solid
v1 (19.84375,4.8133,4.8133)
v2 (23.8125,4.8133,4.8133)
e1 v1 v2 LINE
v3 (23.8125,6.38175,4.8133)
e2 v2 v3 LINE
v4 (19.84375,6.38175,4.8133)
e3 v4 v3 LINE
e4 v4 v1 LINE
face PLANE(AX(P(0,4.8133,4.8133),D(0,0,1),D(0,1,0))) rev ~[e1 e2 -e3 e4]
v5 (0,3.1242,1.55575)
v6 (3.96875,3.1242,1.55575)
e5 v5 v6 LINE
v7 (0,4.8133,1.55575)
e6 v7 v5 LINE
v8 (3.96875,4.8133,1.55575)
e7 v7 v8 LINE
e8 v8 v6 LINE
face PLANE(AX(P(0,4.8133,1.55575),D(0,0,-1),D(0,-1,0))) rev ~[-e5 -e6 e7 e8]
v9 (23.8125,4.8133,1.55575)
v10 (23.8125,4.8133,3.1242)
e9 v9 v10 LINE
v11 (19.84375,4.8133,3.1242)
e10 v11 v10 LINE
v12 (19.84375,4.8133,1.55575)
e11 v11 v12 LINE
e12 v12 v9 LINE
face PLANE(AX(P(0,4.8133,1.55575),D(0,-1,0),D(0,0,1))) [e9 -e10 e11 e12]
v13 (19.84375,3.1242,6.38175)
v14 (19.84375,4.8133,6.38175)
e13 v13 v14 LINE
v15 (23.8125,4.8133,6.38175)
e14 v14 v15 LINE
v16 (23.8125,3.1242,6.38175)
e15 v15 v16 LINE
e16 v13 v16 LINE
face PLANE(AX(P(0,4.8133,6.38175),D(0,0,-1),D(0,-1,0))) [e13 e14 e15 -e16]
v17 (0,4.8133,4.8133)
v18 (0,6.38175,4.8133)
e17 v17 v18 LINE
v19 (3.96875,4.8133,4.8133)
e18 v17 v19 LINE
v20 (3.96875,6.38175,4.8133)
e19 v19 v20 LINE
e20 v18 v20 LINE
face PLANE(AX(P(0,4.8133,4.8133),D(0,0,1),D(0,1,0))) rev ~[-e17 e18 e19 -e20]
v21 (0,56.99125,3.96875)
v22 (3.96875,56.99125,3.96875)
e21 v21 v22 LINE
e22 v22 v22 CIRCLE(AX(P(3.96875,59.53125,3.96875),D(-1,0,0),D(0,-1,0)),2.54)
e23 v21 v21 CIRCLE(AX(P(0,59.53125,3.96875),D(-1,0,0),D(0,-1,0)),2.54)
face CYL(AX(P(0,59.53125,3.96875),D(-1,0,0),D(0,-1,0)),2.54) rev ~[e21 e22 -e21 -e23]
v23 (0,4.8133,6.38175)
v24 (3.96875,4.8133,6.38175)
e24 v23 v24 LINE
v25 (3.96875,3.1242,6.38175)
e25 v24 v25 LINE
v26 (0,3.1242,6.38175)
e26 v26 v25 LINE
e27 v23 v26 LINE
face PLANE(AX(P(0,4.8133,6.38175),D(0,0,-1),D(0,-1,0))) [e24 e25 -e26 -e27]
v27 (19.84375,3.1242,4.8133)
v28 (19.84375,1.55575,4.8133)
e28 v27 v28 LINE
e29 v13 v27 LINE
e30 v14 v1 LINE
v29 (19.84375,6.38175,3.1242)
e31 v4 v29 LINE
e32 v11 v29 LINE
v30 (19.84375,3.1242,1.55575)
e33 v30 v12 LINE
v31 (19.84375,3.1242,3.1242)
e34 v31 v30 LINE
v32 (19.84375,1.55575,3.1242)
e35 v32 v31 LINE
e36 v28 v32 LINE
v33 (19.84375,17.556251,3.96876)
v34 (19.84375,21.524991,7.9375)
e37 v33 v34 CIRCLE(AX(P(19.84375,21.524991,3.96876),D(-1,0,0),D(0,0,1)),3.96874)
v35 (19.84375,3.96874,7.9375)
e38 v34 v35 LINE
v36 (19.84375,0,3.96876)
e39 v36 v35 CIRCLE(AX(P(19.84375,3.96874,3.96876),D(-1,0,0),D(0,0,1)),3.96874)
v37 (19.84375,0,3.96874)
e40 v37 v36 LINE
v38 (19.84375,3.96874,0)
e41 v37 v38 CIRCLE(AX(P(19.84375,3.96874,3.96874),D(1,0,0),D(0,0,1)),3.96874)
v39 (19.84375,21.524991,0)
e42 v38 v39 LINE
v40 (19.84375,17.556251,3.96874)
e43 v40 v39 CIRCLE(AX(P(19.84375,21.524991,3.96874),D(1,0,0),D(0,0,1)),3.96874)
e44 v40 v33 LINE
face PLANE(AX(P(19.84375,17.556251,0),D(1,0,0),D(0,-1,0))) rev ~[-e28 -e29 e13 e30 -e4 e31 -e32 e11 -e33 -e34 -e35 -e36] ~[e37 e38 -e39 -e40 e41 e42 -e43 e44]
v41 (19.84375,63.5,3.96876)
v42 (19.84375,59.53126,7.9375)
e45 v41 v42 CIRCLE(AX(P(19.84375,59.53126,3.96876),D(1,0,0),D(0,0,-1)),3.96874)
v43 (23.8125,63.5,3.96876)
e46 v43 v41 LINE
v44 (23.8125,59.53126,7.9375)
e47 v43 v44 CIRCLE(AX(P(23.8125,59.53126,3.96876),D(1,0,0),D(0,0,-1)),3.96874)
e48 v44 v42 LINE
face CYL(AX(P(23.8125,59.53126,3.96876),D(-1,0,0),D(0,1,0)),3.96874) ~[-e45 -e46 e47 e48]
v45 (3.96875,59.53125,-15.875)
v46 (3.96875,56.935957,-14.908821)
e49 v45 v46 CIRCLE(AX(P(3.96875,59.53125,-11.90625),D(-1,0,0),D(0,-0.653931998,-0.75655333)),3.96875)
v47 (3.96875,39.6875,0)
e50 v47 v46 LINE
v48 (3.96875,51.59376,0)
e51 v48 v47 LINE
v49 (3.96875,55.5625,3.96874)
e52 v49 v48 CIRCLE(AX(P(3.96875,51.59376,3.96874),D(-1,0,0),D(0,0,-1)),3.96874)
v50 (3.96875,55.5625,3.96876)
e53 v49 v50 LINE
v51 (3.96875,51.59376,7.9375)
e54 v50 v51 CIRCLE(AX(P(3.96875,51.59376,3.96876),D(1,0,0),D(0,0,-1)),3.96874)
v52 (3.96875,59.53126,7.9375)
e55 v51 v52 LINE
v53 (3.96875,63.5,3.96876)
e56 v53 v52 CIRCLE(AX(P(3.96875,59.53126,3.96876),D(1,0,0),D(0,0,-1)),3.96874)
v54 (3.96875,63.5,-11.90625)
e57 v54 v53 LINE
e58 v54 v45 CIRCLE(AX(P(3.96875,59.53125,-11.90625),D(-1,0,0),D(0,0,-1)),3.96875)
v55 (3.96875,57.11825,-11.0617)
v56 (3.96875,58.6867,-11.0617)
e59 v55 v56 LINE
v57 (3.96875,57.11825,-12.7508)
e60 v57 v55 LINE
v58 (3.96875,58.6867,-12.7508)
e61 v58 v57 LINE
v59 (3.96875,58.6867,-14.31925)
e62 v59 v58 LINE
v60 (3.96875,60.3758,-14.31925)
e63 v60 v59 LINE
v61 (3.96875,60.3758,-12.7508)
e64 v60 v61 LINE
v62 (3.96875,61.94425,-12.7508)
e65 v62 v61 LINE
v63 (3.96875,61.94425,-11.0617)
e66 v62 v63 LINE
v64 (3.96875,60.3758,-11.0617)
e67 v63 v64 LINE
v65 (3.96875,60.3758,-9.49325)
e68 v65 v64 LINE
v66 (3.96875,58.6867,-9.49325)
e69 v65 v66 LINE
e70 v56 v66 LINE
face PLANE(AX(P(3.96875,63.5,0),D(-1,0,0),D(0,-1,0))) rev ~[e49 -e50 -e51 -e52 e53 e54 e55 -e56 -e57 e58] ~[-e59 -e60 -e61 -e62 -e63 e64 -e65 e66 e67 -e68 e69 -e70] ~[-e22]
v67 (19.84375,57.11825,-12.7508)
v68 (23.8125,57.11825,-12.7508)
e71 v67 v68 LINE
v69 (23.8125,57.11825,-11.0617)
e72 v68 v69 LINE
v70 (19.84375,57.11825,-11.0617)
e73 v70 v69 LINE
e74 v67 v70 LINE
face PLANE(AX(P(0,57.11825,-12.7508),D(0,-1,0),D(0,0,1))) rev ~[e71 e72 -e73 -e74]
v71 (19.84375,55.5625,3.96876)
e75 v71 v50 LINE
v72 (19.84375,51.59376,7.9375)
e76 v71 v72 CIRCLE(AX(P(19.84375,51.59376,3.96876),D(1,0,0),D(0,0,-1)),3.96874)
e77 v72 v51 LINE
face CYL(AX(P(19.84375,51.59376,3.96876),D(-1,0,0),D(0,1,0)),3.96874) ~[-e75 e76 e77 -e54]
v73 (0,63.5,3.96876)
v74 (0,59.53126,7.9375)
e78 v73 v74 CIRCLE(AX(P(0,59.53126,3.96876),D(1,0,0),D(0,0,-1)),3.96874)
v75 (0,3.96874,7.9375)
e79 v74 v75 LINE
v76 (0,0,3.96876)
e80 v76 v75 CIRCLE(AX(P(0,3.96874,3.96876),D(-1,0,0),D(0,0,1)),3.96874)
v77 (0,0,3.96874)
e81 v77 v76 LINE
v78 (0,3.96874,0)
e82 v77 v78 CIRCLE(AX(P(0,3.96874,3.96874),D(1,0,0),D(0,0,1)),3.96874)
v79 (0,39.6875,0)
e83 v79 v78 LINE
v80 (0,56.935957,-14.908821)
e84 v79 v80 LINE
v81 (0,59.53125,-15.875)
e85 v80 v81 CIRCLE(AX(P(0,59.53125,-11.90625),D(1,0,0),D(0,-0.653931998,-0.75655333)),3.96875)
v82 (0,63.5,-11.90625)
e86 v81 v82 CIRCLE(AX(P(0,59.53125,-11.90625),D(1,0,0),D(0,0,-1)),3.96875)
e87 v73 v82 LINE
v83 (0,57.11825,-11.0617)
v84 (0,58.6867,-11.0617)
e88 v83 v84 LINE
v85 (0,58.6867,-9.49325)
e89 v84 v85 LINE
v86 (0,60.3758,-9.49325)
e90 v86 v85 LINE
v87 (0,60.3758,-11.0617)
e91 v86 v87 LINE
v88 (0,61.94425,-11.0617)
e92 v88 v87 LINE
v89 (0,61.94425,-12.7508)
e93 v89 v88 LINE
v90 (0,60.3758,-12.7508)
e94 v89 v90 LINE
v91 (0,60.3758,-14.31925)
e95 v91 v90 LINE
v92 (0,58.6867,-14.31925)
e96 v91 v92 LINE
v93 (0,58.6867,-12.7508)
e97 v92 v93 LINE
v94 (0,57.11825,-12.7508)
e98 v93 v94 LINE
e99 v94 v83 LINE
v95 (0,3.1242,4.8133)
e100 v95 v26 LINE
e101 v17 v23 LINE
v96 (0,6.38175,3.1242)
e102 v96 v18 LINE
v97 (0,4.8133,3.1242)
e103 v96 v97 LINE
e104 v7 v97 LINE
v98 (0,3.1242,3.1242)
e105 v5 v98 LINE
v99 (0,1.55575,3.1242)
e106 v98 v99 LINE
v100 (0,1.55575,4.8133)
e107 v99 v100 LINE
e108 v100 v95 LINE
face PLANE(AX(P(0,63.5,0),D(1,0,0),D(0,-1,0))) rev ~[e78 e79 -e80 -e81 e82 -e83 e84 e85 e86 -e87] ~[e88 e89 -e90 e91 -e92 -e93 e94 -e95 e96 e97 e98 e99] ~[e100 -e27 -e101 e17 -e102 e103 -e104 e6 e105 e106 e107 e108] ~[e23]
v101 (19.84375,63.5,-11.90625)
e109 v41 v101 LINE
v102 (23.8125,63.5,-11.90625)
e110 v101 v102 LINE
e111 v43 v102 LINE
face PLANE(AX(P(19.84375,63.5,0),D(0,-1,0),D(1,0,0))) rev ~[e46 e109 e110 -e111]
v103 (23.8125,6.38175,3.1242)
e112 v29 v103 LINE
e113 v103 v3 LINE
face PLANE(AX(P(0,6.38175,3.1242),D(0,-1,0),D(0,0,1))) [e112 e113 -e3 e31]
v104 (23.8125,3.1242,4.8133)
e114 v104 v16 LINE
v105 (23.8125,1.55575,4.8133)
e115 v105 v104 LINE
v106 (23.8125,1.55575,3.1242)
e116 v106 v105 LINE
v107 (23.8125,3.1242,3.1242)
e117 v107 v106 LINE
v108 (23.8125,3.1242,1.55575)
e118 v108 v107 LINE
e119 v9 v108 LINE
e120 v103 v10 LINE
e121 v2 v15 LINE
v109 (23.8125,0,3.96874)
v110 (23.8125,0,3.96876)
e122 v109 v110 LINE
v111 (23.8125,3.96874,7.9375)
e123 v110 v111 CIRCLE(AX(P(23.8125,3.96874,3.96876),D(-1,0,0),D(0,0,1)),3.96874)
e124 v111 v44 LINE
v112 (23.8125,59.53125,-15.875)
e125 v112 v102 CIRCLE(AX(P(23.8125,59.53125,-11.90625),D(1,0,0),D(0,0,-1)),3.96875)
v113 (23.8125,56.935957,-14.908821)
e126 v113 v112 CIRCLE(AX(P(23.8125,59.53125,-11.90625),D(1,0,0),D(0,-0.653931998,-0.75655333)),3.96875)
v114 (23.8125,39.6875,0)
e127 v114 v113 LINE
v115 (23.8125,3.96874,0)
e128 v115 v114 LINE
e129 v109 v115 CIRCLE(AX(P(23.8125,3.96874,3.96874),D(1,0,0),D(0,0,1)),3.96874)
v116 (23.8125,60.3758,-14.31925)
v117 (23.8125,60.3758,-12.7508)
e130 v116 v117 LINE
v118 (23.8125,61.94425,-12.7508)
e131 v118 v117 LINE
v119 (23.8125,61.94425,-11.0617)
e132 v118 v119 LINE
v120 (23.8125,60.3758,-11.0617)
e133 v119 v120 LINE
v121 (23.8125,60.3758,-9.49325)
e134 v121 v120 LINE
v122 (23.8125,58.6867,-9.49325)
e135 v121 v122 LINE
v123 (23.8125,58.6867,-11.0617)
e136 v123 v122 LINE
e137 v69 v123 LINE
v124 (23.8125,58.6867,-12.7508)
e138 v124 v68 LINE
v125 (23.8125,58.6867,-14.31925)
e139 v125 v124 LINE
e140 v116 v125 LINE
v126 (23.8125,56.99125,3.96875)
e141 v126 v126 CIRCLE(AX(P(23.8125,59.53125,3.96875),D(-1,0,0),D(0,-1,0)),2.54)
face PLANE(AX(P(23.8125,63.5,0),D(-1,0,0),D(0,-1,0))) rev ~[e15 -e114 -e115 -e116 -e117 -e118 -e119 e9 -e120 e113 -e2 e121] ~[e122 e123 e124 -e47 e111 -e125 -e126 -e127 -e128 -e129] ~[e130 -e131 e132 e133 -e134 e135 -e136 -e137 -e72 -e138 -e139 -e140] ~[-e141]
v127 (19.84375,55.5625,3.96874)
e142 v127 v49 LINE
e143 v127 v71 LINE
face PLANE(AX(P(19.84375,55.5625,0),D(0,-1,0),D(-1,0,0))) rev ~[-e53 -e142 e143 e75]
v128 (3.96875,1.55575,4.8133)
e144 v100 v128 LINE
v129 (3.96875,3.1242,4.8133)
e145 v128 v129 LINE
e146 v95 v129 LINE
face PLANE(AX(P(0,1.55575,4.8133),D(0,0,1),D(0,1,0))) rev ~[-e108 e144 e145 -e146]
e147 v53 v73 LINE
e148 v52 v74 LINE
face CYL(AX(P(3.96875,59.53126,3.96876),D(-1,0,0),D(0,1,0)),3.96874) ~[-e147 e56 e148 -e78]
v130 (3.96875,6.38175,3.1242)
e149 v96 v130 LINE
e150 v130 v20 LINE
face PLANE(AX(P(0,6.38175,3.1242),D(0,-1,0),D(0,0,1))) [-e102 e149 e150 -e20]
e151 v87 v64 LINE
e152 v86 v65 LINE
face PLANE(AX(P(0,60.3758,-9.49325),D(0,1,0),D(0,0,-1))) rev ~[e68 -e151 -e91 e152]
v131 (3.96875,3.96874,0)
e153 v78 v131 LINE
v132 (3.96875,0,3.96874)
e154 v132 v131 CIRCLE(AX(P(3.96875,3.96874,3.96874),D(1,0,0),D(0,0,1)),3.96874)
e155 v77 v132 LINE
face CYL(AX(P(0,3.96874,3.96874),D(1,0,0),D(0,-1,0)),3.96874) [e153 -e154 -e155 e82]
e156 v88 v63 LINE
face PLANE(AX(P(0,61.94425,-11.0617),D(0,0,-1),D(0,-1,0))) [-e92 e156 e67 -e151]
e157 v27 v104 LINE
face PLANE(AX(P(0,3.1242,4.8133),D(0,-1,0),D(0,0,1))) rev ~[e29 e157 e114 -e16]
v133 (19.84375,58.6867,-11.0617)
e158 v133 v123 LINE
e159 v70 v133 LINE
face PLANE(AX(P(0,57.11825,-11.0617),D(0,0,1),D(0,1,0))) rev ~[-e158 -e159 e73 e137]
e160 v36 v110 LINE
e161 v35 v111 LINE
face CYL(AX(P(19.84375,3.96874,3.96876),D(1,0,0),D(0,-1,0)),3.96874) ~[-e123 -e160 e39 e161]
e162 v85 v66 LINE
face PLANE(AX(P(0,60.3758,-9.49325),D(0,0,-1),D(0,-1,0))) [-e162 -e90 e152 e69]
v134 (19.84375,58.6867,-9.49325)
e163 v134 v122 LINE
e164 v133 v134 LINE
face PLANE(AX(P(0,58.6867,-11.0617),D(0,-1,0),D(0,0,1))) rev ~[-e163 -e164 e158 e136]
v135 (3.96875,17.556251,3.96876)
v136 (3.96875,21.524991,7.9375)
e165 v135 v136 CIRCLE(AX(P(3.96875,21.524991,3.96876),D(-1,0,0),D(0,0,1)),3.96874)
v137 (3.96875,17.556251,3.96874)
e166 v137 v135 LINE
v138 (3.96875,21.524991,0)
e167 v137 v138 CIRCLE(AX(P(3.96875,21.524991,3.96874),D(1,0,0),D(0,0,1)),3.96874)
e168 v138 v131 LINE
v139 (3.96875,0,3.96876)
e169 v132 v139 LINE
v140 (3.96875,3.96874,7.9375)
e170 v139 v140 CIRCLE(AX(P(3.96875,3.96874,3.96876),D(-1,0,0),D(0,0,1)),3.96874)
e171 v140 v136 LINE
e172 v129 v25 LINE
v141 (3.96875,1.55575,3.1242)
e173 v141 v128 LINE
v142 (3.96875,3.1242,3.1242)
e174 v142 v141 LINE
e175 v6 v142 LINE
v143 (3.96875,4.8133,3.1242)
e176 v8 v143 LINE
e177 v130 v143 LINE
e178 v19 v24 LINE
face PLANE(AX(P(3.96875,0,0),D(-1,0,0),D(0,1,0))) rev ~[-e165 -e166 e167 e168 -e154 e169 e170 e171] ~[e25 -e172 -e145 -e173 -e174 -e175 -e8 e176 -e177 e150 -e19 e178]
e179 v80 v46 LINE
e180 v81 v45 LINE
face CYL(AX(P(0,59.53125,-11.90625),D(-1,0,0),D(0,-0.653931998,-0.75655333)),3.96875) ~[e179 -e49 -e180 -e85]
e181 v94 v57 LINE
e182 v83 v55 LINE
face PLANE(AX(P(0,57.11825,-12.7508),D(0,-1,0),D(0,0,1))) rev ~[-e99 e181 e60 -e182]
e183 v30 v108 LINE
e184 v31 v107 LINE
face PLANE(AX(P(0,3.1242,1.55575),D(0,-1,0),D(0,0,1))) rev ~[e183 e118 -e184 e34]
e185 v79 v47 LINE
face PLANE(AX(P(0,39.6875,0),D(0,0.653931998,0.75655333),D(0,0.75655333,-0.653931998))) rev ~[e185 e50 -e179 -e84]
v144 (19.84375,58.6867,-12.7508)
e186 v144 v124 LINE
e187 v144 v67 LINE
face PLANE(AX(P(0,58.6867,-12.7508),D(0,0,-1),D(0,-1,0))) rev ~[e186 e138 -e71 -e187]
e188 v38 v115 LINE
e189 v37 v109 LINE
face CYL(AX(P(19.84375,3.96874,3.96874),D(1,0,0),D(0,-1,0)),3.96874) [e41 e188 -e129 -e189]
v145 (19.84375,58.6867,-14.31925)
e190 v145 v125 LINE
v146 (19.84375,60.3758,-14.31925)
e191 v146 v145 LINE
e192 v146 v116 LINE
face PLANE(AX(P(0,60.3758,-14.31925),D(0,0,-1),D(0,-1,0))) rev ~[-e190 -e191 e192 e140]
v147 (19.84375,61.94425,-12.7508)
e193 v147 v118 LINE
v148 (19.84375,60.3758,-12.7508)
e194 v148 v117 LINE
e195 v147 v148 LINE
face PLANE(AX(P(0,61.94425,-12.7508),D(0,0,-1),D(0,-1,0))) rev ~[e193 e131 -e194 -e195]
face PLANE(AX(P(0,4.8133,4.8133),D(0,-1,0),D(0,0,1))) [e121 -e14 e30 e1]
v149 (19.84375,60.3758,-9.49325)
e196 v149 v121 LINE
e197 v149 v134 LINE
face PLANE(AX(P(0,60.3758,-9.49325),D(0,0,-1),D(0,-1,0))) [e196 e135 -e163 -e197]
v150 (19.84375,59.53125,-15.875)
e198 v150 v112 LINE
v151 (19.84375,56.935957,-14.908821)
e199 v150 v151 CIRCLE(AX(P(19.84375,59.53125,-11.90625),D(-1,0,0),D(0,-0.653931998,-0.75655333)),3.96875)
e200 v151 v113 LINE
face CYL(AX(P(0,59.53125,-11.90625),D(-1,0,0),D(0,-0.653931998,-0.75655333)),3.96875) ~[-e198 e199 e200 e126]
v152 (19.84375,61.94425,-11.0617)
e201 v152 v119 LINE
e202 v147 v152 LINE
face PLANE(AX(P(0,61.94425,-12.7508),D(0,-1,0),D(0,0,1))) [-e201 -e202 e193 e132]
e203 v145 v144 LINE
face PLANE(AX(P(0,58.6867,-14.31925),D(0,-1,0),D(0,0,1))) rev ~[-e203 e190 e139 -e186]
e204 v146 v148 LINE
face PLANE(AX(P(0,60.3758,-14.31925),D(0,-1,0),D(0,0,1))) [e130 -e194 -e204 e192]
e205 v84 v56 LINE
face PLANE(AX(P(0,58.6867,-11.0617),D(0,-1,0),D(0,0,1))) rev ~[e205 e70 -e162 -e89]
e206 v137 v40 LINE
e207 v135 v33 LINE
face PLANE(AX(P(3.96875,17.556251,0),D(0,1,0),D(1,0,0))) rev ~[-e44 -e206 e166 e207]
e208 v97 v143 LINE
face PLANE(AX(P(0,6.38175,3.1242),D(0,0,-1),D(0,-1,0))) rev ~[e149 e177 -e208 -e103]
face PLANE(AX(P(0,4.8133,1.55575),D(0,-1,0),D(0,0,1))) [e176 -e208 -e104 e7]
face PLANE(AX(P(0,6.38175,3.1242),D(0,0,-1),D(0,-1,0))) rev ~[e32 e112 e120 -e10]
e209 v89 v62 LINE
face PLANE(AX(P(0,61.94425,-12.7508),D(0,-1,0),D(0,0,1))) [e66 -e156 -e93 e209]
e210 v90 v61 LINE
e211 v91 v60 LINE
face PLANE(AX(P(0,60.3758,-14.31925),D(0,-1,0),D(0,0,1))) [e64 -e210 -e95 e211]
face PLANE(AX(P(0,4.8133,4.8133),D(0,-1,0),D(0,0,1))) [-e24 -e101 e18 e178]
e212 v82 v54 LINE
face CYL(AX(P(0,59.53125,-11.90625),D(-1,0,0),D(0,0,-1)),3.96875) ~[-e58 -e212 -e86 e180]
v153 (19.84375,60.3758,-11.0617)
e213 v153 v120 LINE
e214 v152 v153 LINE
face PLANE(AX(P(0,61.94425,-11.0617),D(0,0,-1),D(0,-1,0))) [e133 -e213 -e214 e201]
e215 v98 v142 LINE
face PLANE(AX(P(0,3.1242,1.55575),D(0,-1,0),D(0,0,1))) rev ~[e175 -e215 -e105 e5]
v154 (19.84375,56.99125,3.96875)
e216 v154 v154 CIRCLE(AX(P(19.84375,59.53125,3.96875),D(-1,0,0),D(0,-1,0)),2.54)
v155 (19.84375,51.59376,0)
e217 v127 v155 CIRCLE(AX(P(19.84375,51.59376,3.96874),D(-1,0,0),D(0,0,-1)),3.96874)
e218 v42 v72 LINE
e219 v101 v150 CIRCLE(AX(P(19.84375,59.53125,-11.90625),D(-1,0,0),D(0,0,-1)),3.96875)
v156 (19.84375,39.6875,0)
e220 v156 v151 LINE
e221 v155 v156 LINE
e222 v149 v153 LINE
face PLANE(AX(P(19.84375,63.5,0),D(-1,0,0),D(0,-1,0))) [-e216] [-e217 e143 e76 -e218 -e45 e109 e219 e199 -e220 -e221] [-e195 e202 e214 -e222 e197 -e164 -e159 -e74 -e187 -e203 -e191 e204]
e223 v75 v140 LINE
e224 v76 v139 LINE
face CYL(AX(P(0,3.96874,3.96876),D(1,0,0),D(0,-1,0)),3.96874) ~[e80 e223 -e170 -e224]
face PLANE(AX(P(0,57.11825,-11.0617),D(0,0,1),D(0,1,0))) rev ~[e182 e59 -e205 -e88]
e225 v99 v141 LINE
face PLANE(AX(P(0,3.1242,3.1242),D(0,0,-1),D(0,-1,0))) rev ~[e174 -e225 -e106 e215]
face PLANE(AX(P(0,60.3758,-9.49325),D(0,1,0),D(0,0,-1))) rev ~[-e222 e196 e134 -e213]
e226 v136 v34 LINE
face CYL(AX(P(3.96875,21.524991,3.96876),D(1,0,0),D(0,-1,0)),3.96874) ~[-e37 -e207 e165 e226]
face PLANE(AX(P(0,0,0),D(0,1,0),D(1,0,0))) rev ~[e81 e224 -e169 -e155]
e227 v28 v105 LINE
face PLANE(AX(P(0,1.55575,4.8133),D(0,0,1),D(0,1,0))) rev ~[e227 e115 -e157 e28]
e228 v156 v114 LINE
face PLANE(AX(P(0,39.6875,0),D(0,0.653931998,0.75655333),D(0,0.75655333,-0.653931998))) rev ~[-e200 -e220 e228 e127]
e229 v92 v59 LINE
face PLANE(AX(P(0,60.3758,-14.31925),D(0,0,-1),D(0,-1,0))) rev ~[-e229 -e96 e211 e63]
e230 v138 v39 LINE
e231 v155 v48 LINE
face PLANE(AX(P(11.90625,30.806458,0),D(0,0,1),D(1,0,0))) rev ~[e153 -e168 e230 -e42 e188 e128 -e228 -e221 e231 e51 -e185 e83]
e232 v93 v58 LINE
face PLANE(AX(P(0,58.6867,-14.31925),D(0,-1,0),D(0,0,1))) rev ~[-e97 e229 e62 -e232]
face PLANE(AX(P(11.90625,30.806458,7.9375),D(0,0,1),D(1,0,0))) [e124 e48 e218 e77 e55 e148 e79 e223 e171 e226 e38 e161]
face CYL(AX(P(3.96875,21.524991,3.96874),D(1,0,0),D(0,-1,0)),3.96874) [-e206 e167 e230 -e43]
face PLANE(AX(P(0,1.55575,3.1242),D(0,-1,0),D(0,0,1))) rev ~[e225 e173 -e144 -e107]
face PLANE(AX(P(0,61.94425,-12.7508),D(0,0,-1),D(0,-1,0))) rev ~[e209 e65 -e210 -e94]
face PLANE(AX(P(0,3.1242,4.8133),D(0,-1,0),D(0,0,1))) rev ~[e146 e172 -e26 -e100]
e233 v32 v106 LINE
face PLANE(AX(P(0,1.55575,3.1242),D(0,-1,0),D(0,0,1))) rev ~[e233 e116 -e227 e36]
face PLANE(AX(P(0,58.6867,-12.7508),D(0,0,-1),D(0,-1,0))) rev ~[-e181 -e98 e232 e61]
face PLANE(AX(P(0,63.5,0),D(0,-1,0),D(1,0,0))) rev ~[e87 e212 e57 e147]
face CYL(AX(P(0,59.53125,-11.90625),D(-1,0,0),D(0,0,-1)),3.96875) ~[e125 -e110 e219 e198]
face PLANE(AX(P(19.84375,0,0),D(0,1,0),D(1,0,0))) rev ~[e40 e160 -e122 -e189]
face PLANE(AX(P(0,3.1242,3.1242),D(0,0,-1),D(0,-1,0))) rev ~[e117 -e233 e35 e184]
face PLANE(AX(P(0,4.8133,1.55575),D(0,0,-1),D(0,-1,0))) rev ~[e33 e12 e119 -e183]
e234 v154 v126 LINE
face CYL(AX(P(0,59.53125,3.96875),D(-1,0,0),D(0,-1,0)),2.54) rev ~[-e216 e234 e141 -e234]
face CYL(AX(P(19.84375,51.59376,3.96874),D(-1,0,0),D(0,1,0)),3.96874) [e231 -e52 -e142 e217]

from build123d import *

# Parameters (mm, degrees)
F1_DEPTH = 7.9375
F2_R     = 3.96874
F3_W     = 3.96875
F3_H     = 23.8125
F4_DEPTH = 15.875
F5_W     = 1.56845
F5_H     = 1.6891
F5_W_2   = 1.6891
F5_H_2   = 1.56845
F5_R     = 2.54
F6_DEPTH = 23.8125


# Not quite as in the source:
# - a fillet or chamfer is up to 0.001 mm smaller than in the source, because OpenCascade refuses the exact size


with BuildPart() as f1:
    # F0 (on Top) → F1 (new body)
    with BuildSketch(Plane.XY):
        Polygon((0, 63.5), (0, 0), (3.96875, 0), (3.96875, 17.5562514), (19.84375, 17.5562514), (19.84375, 0), (23.8125, 0), (23.8125, 63.5), (19.84375, 63.5), (19.84375, 55.5625), (3.96875, 55.5625), (3.96875, 63.5), align=None)
    extrude(amount=F1_DEPTH)

    # F2 (radius 3.96875 in the source; OpenCascade refuses exactly that, so slightly less here)
    f2_edges = [f1.edges().sort_by_distance(p)[0] for p in [
        (11.90625, 55.5625, 7.9375),
        (11.90625, 55.5625, 0),
        (1.984375, 63.5, 7.9375),
        (21.828125, 63.5, 7.9375),
        (1.984375, 0, 7.9375),
        (1.984375, 0, 0),
        (21.828125, 0, 7.9375),
        (21.828125, 0, 0),
        (11.90625, 17.556251, 7.9375),
        (11.90625, 17.556251, 0),
    ]]
    fillet(f2_edges, radius=F2_R)

    # F3 (on face) → F4 (join)
    with BuildSketch(Plane(origin=(0, 0, 0), x_dir=(1, 0, 0), z_dir=(0, 0, -1))):
        with Locations((21.828125, -51.59375)):
            Rectangle(F3_W, F3_H)
        with Locations((1.984375, -51.59375)):
            Rectangle(F3_W, F3_H)
    extrude(amount=F4_DEPTH)

    # F5 (on face) → F6 (cut, through all)
    with BuildSketch(Plane(origin=(0, 0, 0), x_dir=(0, -1, 0), z_dir=(-1, 0, 0))):
        with Locations((-5.597525, 3.96875)):
            Rectangle(F5_W, F5_H)
        with Locations((-3.96875, 3.96875)):
            Rectangle(F5_W_2, F5_H)
        with Locations((-3.96875, 2.339975)):
            Rectangle(F5_W_2, F5_H_2)
        with Locations((-2.339975, 3.96875)):
            Rectangle(F5_W, F5_H)
        with Locations((-3.96875, 5.597525)):
            Rectangle(F5_W_2, F5_H_2)
        with BuildLine():
            Line((-63.5, -15.875), (-59.53125, -15.875))
            ThreePointArc((-59.53125, -15.875), (-62.3375800378, -14.7125800378), (-63.5, -11.90625))
            Line((-63.5, -11.90625), (-63.5, -15.875))
        make_face()
        with BuildLine():
            Line((-59.53125, -15.875), (-39.6875, -15.875))
            Line((-39.6875, -15.875), (-39.6875, 0))
            Line((-39.6875, 0), (-56.935957382, -14.9088210299))
            ThreePointArc((-56.935957382, -14.9088210299), (-58.146597916, -15.6256202651), (-59.53125, -15.875))
        make_face()
        with Locations((-57.902475, -11.90625)):
            Rectangle(F5_W, F5_H)
        with Locations((-59.53125, -11.90625)):
            Rectangle(F5_W_2, F5_H)
        with Locations((-59.53125, -10.277475)):
            Rectangle(F5_W_2, F5_H_2)
        with Locations((-61.160025, -11.90625)):
            Rectangle(F5_W, F5_H)
        with Locations((-59.53125, -13.535025)):
            Rectangle(F5_W_2, F5_H_2)
        with Locations((-59.53125, 3.96875)):
            Circle(F5_R)
    extrude(amount=-F6_DEPTH, mode=Mode.SUBTRACT)


solid = f1.part
